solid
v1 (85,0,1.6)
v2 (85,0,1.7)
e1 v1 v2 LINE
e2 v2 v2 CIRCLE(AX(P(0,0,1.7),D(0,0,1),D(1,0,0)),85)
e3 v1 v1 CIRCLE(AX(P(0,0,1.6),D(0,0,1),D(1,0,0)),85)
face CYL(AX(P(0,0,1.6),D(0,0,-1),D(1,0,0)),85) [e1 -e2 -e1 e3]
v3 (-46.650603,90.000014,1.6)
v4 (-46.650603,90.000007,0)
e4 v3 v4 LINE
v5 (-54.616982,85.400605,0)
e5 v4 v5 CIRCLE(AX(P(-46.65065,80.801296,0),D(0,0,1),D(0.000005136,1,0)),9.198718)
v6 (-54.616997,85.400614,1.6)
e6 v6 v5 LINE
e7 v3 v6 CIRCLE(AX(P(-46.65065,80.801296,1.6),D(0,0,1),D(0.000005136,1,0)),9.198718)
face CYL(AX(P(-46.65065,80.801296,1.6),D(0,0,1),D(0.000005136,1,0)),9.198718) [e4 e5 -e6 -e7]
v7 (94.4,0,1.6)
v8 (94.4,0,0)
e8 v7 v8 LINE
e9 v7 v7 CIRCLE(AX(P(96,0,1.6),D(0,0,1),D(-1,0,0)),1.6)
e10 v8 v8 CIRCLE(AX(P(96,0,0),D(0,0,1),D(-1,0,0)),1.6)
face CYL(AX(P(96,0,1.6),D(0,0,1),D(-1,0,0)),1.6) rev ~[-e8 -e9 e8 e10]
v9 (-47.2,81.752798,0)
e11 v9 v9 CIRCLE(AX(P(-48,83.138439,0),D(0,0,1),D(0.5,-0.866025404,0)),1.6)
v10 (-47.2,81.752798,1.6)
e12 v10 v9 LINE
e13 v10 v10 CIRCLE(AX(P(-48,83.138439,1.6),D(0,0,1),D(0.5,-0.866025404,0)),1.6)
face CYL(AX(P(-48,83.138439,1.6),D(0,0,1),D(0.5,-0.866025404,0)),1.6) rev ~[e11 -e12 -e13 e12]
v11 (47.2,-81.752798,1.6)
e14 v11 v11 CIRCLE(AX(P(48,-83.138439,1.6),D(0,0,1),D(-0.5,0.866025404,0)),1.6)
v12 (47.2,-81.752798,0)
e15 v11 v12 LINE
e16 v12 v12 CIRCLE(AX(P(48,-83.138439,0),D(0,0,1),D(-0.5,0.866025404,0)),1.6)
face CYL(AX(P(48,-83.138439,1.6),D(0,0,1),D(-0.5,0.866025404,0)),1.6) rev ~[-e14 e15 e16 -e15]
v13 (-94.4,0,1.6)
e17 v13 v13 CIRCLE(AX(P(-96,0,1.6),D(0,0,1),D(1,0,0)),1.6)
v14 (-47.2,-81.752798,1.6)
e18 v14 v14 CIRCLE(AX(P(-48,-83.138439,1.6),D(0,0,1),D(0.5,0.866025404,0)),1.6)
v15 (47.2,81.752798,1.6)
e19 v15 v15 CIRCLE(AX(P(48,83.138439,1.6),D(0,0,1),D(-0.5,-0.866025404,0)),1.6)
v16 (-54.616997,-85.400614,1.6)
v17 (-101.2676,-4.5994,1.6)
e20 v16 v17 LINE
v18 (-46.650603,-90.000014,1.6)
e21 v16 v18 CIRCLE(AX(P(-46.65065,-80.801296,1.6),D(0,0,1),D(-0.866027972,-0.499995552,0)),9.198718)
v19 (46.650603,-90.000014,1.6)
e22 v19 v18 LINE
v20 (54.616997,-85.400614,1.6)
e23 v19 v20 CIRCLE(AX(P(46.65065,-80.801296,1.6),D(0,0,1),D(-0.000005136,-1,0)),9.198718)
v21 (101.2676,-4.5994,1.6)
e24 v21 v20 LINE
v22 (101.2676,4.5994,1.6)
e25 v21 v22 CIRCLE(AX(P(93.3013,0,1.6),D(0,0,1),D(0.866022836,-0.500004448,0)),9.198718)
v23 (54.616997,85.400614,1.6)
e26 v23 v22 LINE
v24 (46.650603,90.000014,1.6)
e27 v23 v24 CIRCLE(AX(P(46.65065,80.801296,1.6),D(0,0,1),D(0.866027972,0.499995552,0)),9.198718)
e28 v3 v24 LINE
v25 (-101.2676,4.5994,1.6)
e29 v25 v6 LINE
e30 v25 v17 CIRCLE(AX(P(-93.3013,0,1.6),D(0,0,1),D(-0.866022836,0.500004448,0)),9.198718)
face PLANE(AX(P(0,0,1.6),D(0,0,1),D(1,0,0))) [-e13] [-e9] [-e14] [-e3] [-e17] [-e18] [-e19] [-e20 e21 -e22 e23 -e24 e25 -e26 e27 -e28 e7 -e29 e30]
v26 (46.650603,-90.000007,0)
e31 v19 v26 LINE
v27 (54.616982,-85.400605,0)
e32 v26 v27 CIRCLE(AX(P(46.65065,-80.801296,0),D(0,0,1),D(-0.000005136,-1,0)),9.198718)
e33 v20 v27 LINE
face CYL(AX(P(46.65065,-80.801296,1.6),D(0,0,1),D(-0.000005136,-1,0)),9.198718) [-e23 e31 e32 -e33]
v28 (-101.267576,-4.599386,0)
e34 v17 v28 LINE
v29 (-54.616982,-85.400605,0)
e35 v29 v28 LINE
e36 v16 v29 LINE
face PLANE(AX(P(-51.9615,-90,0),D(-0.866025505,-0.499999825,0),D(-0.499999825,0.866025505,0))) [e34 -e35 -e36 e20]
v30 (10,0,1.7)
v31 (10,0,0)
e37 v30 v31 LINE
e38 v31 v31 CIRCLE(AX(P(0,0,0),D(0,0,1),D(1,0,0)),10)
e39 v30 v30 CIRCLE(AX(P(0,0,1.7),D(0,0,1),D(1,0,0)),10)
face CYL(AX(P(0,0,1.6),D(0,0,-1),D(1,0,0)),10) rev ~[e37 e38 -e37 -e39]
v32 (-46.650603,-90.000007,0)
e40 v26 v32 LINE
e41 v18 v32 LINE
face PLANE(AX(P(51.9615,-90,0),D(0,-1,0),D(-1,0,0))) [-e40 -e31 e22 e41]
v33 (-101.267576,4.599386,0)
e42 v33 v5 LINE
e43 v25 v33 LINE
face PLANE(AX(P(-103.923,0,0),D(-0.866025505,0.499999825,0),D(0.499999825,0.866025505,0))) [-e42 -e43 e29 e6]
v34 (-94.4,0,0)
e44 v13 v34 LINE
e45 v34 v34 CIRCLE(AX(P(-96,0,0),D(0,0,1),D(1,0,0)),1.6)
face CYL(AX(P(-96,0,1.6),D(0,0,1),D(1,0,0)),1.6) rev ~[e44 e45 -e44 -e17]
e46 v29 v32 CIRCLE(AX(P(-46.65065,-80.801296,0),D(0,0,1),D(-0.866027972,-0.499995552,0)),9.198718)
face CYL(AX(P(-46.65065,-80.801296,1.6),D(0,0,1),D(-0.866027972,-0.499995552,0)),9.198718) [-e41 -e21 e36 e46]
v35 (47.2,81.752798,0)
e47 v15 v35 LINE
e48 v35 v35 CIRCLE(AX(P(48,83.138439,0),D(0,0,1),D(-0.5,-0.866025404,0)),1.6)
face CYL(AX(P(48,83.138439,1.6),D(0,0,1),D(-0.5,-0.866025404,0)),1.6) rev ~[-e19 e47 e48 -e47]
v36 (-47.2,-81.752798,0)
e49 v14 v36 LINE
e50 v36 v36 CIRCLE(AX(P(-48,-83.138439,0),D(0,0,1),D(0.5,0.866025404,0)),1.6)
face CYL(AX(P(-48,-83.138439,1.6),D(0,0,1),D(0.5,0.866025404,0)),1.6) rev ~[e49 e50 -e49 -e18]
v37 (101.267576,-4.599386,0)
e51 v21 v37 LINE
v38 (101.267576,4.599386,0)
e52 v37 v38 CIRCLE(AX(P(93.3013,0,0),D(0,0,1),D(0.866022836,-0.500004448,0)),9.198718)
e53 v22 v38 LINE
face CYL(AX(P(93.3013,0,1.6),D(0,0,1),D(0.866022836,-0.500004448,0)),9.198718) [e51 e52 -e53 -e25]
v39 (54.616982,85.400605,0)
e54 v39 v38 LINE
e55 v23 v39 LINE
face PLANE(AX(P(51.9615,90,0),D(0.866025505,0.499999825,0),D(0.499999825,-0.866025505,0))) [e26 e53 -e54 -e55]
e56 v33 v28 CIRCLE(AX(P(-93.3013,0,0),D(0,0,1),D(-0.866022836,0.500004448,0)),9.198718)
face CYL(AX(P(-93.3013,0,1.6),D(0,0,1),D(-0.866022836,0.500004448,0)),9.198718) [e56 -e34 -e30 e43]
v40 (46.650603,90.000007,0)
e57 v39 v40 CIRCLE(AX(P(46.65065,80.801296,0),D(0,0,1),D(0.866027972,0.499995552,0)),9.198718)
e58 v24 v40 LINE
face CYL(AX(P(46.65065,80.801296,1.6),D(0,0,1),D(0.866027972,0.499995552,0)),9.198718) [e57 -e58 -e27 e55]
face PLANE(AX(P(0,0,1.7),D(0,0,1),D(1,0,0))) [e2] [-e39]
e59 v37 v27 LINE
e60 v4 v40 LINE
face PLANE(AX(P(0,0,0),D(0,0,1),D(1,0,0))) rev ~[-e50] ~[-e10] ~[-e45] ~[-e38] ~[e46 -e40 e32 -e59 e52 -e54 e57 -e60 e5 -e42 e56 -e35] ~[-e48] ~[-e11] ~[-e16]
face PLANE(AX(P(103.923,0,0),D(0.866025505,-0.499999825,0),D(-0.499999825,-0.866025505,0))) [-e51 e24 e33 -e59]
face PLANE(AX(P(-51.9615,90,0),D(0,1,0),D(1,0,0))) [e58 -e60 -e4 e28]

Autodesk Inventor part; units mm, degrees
ref_plane "YZ Plane" through (0, 0, 0) normal (1, 0, 0) x (0, 1, 0)
ref_plane "XZ Plane" through (0, 0, 0) normal (0, 1, 0) x (-1, 0, 0)
ref_plane "XY Plane" through (0, 0, 0) normal (0, 0, 1) x (1, 0, 0)
sketch "Sketch1" plane through (0, 0, 0) normal (0, 0, 1) x (1, 0, 0)
  line L0 (51.9615, 90) -> (103.923, 0)
  line L1 (103.923, 0) -> (51.9615, -90)
  line L2 (51.9615, -90) -> (-51.9615, -90)
  line L3 (-51.9615, -90) -> (-103.923, 0)
  line L4 (-103.923, 0) -> (-51.9615, 90)
  line L5 (-51.9615, 90) -> (51.9615, 90)
  circle A0 centre (0, 0) radius 85
  circle A1 centre (0, 0) radius 10
  dimension "d1" = 170
  dimension "d2" = 180
  dimension "d12" = 20
extrude "Extrusion1" add sketch "Sketch1" along normal blind 1.6 contours L0 L1 L2 L3 L4 L5 | A0
sketch "Sketch3" plane through (0, 0, 1.6) normal (0, 0, 1) x (1, 0, 0)
  circle A0 centre (0, 0) radius 10 projected
  circle A1 centre (-96, 0) radius 1.6
  line L0 (-51.9615, 90) -> (-103.923, 0) projected
  line L1 (-103.923, 0) -> (-51.9615, -90) projected
  arc A2 (-101.2676, 4.5994) -> (-101.2676, -4.5994) centre (-93.3013, 0) ccw
  dimension "d13" = 96
  dimension "d14" = 3.2
  dimension "d20" = 9.1987
  dimension "d21" = 93.3013
extrude "Extrusion3" cut sketch "Sketch3" against normal up to next contours A1 | A2 L1 L0
pattern_circular "Circular Pattern1" count 6 over 360 about axis through (0, 0, 0) along (0, 0, 1) of "Extrusion3"
sketch "Sketch4" plane through (0, 0, 1.6) normal (0, 0, 1) x (1, 0, 0)
  circle A0 centre (0, 0) radius 10 projected
  circle A1 centre (0, 0) radius 85
  dimension "d22" = 170
extrude "Extrusion4" add sketch "Sketch4" along normal blind 0.1
properties part number "Heatbed_170mm_Hex"
